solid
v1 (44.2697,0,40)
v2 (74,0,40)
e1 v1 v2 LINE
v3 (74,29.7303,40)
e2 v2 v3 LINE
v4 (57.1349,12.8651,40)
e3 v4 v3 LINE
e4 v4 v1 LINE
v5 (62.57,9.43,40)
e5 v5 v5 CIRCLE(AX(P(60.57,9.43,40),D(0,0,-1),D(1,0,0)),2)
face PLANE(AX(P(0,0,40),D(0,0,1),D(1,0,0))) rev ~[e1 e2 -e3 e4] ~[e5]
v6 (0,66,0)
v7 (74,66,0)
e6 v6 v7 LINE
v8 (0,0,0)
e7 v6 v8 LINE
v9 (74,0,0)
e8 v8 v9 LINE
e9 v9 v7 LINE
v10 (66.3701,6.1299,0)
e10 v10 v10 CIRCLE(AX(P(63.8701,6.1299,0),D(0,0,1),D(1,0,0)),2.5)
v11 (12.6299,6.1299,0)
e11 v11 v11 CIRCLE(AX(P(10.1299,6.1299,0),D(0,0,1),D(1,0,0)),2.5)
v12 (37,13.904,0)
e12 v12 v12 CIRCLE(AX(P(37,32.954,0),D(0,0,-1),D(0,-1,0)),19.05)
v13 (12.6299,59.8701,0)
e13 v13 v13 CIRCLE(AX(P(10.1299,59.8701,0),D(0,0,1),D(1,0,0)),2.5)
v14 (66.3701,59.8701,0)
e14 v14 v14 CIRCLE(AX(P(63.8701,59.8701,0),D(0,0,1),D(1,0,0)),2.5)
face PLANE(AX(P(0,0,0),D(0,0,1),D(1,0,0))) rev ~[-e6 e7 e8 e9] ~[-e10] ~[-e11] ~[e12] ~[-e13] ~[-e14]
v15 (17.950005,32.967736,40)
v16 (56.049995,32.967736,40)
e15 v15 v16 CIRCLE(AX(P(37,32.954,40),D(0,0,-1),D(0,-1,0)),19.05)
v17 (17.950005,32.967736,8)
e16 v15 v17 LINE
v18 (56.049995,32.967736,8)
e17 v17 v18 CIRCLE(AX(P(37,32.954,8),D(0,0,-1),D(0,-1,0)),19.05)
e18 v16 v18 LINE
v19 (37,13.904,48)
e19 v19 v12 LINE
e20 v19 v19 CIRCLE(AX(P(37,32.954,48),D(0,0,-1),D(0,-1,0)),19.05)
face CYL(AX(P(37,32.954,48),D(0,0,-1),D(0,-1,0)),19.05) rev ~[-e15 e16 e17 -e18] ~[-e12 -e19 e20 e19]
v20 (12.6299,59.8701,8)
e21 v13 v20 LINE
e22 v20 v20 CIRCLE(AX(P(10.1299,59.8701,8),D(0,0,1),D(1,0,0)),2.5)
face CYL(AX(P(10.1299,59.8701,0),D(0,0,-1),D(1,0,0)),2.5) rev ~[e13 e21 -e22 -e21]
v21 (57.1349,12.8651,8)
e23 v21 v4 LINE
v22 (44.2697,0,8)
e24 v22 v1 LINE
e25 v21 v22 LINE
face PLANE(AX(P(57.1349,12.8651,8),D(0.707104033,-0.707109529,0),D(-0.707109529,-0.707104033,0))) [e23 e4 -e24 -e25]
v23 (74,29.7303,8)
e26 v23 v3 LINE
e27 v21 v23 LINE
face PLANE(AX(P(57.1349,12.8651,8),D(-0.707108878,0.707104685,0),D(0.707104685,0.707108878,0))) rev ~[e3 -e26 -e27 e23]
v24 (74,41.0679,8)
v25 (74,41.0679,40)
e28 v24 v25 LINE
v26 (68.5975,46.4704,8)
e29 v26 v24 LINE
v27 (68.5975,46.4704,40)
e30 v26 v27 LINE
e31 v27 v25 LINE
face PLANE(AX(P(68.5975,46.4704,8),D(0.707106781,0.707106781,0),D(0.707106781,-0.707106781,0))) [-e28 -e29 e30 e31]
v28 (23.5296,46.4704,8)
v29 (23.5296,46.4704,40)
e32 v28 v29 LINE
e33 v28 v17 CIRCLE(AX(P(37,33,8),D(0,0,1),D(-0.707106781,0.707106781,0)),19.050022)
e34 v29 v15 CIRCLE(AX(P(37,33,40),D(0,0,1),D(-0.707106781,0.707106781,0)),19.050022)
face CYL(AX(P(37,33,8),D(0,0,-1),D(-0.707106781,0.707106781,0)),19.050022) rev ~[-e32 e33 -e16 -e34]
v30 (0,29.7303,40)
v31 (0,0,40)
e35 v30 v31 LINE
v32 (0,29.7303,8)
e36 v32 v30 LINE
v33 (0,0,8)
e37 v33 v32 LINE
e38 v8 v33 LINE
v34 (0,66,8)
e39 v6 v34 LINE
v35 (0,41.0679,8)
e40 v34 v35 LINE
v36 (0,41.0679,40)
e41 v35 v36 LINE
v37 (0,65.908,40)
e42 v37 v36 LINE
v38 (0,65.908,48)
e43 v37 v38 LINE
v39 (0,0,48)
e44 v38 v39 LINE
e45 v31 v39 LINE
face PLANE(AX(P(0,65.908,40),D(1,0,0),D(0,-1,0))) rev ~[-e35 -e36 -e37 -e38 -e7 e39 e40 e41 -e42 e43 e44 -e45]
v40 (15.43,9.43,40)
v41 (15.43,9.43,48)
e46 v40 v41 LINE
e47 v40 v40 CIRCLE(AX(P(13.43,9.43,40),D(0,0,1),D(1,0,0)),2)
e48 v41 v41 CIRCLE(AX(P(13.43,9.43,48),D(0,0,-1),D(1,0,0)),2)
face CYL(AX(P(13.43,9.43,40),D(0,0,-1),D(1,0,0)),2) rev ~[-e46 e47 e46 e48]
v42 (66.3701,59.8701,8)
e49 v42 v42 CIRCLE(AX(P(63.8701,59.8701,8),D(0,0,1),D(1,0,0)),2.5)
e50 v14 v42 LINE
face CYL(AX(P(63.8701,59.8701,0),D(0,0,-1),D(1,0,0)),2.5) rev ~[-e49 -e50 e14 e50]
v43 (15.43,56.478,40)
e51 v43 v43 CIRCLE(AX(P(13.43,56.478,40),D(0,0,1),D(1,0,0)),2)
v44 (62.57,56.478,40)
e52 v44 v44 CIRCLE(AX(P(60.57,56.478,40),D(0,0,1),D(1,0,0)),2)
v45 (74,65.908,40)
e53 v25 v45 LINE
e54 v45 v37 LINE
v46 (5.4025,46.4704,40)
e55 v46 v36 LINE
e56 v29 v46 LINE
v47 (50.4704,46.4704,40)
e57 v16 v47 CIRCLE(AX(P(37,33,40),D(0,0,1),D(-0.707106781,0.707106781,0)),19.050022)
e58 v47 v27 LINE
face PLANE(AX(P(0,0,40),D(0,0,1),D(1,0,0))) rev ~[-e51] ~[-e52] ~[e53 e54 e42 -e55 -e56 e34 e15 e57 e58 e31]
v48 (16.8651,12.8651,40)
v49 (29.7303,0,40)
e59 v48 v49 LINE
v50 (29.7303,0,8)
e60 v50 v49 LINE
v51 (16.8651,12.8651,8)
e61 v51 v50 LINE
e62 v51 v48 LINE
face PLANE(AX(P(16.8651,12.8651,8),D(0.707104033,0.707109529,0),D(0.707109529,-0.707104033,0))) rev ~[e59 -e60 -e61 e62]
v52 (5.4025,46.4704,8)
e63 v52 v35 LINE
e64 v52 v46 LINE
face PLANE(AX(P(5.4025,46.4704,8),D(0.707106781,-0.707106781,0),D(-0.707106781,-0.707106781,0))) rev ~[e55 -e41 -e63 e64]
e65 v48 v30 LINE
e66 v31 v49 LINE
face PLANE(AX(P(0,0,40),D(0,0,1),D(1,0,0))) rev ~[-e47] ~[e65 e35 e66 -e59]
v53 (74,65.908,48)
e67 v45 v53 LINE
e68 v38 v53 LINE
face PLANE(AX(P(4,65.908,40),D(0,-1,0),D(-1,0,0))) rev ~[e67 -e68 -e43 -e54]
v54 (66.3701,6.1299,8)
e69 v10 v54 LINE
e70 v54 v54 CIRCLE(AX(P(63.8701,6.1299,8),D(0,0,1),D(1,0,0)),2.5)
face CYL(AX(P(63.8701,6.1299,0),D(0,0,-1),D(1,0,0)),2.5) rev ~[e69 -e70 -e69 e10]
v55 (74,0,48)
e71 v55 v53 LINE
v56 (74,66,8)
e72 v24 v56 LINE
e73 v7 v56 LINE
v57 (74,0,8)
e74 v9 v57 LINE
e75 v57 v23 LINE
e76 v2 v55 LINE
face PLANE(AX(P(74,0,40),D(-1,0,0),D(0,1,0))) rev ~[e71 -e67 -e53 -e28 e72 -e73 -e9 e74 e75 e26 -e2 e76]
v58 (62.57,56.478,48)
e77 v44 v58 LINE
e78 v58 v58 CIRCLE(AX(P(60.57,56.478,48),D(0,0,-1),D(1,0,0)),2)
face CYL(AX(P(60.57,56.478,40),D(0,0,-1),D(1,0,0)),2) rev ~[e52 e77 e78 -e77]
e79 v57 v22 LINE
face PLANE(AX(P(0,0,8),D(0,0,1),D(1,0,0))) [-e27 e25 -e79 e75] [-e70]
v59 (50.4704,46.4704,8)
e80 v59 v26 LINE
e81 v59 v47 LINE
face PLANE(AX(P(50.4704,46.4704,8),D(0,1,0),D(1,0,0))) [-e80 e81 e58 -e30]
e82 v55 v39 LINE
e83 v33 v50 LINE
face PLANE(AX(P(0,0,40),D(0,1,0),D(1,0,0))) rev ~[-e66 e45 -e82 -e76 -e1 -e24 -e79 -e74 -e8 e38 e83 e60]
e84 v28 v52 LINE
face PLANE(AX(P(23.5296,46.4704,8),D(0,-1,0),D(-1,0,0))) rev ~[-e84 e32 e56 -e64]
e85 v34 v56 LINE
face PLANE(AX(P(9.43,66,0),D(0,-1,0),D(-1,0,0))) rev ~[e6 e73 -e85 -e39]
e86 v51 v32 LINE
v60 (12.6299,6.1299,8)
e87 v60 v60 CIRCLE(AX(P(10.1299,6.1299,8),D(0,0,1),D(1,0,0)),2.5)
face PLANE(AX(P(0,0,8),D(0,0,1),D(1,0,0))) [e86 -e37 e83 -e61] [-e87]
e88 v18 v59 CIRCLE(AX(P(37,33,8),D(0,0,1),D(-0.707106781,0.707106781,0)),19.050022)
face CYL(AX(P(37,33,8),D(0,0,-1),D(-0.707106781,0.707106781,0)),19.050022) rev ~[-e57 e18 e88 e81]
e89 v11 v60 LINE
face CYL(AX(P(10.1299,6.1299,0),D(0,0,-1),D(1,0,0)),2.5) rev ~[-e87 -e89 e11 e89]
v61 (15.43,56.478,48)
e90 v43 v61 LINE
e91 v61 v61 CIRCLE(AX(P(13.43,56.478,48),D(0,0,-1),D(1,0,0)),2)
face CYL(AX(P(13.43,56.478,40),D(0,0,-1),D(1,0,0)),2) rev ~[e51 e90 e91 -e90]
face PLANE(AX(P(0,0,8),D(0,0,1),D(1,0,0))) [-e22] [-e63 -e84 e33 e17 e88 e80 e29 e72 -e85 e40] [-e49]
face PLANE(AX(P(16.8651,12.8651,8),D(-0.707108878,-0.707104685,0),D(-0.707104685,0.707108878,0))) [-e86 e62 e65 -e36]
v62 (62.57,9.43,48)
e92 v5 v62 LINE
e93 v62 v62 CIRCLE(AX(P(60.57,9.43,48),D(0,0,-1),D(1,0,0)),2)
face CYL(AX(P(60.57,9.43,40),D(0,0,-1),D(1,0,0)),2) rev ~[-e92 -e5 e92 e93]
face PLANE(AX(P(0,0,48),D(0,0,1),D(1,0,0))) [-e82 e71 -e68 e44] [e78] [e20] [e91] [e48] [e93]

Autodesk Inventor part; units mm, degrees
ref_plane "YZ Plane" through (0, 0, 0) normal (1, 0, 0) x (0, 1, 0)
ref_plane "XZ Plane" through (0, 0, 0) normal (0, 1, 0) x (-1, 0, 0)
ref_plane "XY Plane" through (0, 0, 0) normal (0, 0, 1) x (1, 0, 0)
sketch "Sketch1" plane through (0, 0, 0) normal (0, 0, 1) x (1, 0, 0)
  line L0 (0, 0) -> (74, 0)
  line L1 (74, 0) -> (74, 66)
  line L2 (74, 66) -> (0, 66)
  line L3 (0, 66) -> (0, 0)
  line L4 (0, 0) -> (0, 9.43)
  line L5 (74, 0) -> (64.57, 0)
  line L6 (0, 66) -> (9.43, 66)
  line L7 (74, 66) -> (64.57, 66)
  line L8 (37, 33) -> (75, 33) construction
  line L9 (37, 33) -> (75, 33) construction
  circle A0 centre (10.1299, 59.8701) radius 2.5
  circle A1 centre (63.8701, 59.8701) radius 2.5
  circle A2 centre (63.8701, 6.1299) radius 2.5
  circle A3 centre (10.1299, 6.1299) radius 2.5
  dimension "d0" = 74
  dimension "d1" = 66
  dimension "d2" = 9.43
  dimension "d4" = 9.43
  dimension "d6" = 9.43
  dimension "d8" = 9.43
  dimension "d14" = 5
  dimension "d15" = 5
  dimension "d16" = 5
  dimension "d17" = 5
extrude "Extrusion1" add sketch "Sketch1" along normal blind 8
sketch "Sketch2" plane through (0, 0, 8) normal (0, 0, 1) x (1, 0, 0)
  line L0 (0, 0) -> (0, 66) projected
  line L1 (74, 0) -> (0, 0) projected
  line L2 (74, 66) -> (74, 0) projected
  line L3 (5.4025, 46.4704) -> (0, 41.0679)
  line L4 (14.4661, 10.4661) -> (24.9321, 0)
  line L5 (68.5975, 46.4704) -> (74, 41.0679)
  line L6 (14.4661, 10.4661) -> (0, 24.9321)
  arc A0 (23.5296, 46.4704) -> (50.4704, 46.4704) centre (37, 33) ccw
  line L7 (50.4704, 46.4704) -> (68.5975, 46.4704)
  line L8 (23.5296, 46.4704) -> (5.4025, 46.4704)
  circle A1 centre (63.8701, 6.1299) radius 2.5 projected
  circle A2 centre (10.1299, 6.1299) radius 2.5 projected
  line L9 (57.1349, 12.8651) -> (74, 29.7303)
  line L10 (57.1349, 12.8651) -> (44.2697, 0)
  line L11 (10.1299, 6.1299) -> (16.8651, 12.8651)
  line L12 (16.8651, 12.8651) -> (0, 29.7303)
  line L13 (16.8651, 12.8651) -> (29.7303, 0)
  point P0 (49.0679, 0)
  point P1 (74, 24.9321)
  dimension "d23" = 38.1
  dimension "d26" = 9.525
  dimension "d27" = 9.525
extrude "Extrusion2" add sketch "Sketch2" along normal blind 32 contours L0 L3 L8 A0 L7 L5 L2 L9 L10 L1 L13 L12
sketch "Sketch4" plane through (0, 0, 40) normal (0, 0, 1) x (1, 0, 0)
  line L0 (0, 0) -> (74, 0)
  line L1 (74, 0) -> (74, 65.908)
  line L2 (74, 65.908) -> (0, 65.908)
  line L3 (0, 65.908) -> (0, 0)
  line L4 (4, 65.908) -> (70, 65.908)
  line L5 (70, 0) -> (4, 0)
  line L6 (4, 65.908) -> (13.43, 65.908)
  line L7 (13.43, 65.908) -> (13.43, 56.478)
  line L8 (4, 9.43) -> (13.43, 9.43)
  line L9 (70, 0) -> (60.57, 0)
  line L10 (60.57, 0) -> (60.57, 9.43)
  line L11 (70, 65.908) -> (60.57, 65.908)
  line L12 (60.57, 65.908) -> (60.57, 56.478)
  circle A0 centre (13.43, 56.478) radius 2
  circle A1 centre (13.43, 9.43) radius 2
  circle A2 centre (60.57, 9.43) radius 2
  circle A3 centre (60.57, 56.478) radius 2
  dimension "d30" = 9.43
  dimension "d31" = 9.43
  dimension "d32" = 9.43
  dimension "d33" = 9.43
  dimension "d34" = 9.43
  dimension "d35" = 9.43
  dimension "d36" = 9.43
  dimension "d37" = 9.43
  dimension "d38" = 4
  dimension "d39" = 4
  dimension "d40" = 4
  dimension "d41" = 4
extrude "Extrusion3" add sketch "Sketch4" along normal blind 8
sketch "Sketch5" plane through (0, 0, 48) normal (0, 0, 1) x (1, 0, 0)
  line L0 (0, 65.908) -> (74, 0)
  line L1 (74, 65.908) -> (0, 0)
  circle A0 centre (37, 32.954) radius 19.05
  dimension "d44" = 38.1
hole "Hole1" at (37, 32.954, 48) direction (0, 0, -1) diameter 38.1 depth 127 tip angle 118
properties part number "motor bracket GL-15N"
